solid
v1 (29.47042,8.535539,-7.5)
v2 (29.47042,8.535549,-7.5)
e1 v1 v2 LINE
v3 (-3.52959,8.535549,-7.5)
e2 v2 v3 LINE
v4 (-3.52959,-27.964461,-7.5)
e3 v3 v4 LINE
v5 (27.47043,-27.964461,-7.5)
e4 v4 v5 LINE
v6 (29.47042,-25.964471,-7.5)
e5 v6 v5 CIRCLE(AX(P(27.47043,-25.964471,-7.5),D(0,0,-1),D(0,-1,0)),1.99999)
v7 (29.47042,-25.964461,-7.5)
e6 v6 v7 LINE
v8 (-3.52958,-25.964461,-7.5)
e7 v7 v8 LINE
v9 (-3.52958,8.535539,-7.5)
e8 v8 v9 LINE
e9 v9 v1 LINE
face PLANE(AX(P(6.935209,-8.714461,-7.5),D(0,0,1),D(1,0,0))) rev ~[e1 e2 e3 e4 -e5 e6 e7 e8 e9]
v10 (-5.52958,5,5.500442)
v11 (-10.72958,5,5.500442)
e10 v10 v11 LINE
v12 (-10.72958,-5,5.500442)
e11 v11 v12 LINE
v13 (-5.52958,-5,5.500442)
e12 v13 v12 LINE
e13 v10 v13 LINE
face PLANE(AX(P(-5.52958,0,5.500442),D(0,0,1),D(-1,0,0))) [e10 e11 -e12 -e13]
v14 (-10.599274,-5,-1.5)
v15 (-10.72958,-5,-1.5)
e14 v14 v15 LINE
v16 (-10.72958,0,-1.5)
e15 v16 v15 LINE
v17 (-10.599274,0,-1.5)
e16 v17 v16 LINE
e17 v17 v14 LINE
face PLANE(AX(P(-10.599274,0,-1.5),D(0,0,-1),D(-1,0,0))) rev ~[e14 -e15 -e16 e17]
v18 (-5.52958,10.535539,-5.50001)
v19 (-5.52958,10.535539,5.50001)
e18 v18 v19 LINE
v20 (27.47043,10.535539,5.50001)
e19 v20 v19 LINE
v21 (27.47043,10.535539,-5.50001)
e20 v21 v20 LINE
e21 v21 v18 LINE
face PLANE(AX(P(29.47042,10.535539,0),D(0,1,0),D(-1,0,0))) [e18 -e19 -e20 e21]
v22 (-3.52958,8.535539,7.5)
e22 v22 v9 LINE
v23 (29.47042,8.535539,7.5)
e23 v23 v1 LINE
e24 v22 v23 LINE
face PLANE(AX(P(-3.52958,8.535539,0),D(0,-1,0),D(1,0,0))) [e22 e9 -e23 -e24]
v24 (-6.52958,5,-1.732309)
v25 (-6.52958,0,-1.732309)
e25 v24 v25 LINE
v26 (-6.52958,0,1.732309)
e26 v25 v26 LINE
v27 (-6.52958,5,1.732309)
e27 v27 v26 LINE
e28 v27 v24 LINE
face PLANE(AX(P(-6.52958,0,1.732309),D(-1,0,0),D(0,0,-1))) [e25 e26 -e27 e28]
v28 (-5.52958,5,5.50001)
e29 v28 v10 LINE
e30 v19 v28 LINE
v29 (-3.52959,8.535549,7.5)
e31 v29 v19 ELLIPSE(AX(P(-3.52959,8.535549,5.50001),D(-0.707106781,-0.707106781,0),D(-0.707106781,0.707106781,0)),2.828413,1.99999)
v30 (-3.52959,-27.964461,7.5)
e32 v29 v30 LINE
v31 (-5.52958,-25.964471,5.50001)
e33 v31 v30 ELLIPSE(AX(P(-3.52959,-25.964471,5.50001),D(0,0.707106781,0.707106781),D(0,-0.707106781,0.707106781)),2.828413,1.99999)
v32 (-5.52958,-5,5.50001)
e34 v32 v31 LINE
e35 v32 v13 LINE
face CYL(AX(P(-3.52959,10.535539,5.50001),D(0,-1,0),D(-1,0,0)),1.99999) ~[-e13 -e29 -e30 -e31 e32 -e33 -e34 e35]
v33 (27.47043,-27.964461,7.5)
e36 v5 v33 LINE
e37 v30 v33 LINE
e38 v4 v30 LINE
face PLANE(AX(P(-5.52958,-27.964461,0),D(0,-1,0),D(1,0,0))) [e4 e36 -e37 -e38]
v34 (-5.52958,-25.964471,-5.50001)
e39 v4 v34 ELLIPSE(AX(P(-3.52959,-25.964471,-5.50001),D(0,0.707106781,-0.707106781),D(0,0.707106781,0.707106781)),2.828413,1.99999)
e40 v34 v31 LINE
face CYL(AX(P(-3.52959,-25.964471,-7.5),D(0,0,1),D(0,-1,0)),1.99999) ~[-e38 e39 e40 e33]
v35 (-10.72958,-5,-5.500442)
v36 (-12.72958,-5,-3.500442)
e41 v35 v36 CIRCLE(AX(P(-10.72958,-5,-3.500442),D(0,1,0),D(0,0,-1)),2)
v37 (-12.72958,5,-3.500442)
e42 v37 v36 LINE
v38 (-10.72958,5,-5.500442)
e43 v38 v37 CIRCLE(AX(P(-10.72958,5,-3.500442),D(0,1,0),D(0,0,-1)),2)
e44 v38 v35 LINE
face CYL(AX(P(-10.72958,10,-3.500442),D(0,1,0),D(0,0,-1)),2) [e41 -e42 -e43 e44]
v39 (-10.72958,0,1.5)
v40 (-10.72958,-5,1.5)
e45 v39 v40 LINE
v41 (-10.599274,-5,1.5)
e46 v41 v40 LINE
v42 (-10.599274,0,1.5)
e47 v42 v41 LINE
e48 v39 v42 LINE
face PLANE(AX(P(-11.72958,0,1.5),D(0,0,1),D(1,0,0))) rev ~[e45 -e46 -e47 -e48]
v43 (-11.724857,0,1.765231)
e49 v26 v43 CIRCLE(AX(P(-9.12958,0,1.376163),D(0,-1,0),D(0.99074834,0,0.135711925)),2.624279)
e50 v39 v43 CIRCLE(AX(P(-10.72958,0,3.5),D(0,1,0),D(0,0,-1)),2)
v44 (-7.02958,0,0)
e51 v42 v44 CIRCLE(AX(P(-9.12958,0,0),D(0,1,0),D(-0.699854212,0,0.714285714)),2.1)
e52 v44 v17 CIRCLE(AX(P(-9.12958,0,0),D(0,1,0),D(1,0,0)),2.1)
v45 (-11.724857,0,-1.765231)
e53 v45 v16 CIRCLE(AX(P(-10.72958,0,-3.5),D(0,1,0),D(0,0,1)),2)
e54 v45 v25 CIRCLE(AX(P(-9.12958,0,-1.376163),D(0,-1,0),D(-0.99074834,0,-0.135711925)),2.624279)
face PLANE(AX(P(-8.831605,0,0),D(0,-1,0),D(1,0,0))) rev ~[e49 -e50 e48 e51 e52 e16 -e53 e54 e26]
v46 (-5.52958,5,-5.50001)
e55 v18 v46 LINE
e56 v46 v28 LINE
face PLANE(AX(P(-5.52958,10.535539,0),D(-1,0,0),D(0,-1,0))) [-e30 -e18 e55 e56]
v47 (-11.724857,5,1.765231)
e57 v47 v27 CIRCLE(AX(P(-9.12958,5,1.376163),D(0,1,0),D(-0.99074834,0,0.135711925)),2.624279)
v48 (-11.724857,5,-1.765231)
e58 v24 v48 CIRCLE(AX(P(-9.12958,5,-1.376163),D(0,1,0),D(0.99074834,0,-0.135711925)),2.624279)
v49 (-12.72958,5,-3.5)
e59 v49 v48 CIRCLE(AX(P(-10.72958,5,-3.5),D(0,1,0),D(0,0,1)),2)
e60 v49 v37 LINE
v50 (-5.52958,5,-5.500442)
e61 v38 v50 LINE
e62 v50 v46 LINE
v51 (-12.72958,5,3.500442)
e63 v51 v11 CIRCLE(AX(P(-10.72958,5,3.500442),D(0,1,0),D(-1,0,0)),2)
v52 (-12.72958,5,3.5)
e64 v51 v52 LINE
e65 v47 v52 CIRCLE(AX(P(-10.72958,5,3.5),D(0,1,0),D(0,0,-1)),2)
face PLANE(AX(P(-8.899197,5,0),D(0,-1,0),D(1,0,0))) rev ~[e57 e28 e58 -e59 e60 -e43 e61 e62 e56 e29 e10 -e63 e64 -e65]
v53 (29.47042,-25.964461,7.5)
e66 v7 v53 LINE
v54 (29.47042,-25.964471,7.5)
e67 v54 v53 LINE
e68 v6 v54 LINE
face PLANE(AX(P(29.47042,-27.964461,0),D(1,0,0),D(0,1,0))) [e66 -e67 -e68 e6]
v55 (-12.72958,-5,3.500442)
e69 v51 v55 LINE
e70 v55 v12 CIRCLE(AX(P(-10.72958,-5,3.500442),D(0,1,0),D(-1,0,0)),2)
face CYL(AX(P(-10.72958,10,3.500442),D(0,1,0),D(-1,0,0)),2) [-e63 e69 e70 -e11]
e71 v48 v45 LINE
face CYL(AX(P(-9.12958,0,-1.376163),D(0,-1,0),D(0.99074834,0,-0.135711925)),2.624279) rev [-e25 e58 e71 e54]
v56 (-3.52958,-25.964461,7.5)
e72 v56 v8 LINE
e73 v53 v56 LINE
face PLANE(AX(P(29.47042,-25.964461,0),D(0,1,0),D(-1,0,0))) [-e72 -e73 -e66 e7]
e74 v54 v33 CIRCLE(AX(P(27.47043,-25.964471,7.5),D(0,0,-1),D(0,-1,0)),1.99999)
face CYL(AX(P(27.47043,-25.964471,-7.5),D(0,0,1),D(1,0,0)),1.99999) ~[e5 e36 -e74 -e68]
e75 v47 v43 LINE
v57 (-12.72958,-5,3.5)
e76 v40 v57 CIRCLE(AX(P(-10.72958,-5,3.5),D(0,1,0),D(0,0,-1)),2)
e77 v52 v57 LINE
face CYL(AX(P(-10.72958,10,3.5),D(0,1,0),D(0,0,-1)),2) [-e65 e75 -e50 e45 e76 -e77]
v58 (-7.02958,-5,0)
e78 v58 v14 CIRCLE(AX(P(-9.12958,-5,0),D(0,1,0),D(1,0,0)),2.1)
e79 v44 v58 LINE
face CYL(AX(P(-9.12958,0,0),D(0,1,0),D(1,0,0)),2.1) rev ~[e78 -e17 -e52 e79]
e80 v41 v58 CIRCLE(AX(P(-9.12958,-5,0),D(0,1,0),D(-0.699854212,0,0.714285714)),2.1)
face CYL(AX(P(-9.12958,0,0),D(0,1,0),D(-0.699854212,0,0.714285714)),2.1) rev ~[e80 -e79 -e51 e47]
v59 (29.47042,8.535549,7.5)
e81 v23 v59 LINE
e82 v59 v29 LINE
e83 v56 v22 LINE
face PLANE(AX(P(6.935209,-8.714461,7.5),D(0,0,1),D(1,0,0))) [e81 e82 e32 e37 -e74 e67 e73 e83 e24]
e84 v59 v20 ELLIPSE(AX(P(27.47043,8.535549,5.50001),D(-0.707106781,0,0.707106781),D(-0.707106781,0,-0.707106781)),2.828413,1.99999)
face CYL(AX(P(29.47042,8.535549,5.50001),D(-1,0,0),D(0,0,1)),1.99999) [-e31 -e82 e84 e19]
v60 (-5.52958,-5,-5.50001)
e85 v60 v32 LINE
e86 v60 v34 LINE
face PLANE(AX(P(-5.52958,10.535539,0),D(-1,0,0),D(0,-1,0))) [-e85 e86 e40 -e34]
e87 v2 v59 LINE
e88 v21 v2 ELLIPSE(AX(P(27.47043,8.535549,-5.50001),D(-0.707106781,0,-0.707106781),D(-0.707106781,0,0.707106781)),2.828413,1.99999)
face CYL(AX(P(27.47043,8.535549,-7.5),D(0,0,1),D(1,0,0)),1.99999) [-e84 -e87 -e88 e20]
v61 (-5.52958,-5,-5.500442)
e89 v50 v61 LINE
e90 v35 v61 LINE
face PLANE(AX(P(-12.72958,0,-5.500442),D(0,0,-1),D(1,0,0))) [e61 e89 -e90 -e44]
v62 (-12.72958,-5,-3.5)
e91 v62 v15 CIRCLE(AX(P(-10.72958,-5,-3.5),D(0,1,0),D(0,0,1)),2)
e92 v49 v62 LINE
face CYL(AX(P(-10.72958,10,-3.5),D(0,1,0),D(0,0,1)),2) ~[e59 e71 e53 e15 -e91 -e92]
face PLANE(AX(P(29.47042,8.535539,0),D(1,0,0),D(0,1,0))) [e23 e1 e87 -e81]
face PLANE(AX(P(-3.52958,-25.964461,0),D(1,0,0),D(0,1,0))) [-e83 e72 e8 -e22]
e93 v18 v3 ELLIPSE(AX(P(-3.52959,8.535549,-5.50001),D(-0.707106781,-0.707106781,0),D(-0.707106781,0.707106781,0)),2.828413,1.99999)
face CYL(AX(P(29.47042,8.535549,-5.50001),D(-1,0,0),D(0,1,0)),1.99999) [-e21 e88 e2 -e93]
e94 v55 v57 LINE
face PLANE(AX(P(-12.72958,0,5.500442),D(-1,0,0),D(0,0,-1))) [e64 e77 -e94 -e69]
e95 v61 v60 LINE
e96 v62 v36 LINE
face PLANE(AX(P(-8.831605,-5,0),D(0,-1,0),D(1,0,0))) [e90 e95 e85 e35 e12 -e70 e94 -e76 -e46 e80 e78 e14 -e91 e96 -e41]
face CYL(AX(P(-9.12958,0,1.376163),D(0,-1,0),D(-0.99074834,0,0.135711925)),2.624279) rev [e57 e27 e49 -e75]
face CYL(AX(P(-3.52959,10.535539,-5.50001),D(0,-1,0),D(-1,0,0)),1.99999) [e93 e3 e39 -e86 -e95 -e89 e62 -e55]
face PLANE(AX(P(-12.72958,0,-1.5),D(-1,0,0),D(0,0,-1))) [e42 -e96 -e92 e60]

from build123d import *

# Parameters (mm, degrees)
F1_DEPTH    = 7.5
F2_R        = 1.99999
F4_DEPTH    = 5
F5_DEPTH    = 5
F6_T1_DEPTH = 20


# Not quite as in the source:
# - a fillet or chamfer that OpenCascade refuses, or shapes differently, is made with other operations: its cross-section is extruded or revolved along the edge and cut away or added
# - a fillet or chamfer is up to 0.001 mm smaller than in the source, because OpenCascade refuses the exact size


with BuildPart() as f1:
    # F0 (on Top) → F1 (new body, symmetric)
    with BuildSketch(Plane.XY):
        Polygon((29.4704200836, 8.5355388032), (29.4704200836, 10.5355388032), (-5.5295799164, 10.5355388032), (-5.5295799164, -27.9644611968), (29.4704200836, -27.9644611968), (29.4704200836, -25.9644611968), (27.4704200836, -25.9644611968), (-3.5295799164, -25.9644611968), (-3.5295799164, 8.5355388032), (27.4704200836, 8.5355388032), align=None)
    extrude(amount=F1_DEPTH, both=True)

    # F2 (radius 2 in the source; OpenCascade refuses exactly that, so slightly less here)
    f2_edges = [f1.edges().sort_by_distance(p)[0] for p in [
        (11.97042, 10.535539, 7.5),
        (11.97042, 10.535539, -7.5),
        (-5.52958, -8.714461, 7.5),
        (29.47042, -27.964461, 0),
        (-5.52958, -27.964461, 0),
        (29.47042, 10.535539, 0),
        (-5.52958, -8.714461, -7.5),
    ]]
    fillet(f2_edges, radius=F2_R)

    # F3 (on Front) → F4 (join, symmetric)
    with BuildSketch(Plane.XZ):
        with BuildLine():
            ThreePointArc((-11.7295799164, 1.7323087668), (-9.1295799164, 4.000441756), (-6.5295799164, 1.7323087668))
            Line((-6.5295799164, 1.7323087668), (-6.5295799164, -1.7323087668))
            ThreePointArc((-6.5295799164, -1.7323087668), (-9.1295799164, -4.000441756), (-11.7295799164, -1.7323087668))
            Line((-11.7295799164, -1.7323087668), (-11.7295799164, -1.5))
            Line((-11.7295799164, -1.5), (-12.7295799164, -1.5))
            Line((-12.7295799164, -1.5), (-12.7295799164, -5.500441756))
            Line((-12.7295799164, -5.500441756), (-5.5295799164, -5.500441756))
            Line((-5.5295799164, -5.500441756), (-5.5295799164, 5.500441756))
            Line((-5.5295799164, 5.500441756), (-12.7295799164, 5.500441756))
            Line((-12.7295799164, 5.500441756), (-12.7295799164, 1.5))
            Line((-12.7295799164, 1.5), (-11.7295799164, 1.5))
            Line((-11.7295799164, 1.5), (-11.7295799164, 1.7323087668))
        make_face()
    extrude(amount=F4_DEPTH, both=True)

    # F3 (on Front) → F5 (join)
    with BuildSketch(Plane.XZ):
        with BuildLine():
            Line((-6.5295799164, -1.7323087668), (-6.5295799164, 1.7323087668))
            ThreePointArc((-6.5295799164, 1.7323087668), (-9.1295799164, 4.000441756), (-11.7295799164, 1.7323087668))
            Line((-11.7295799164, 1.7323087668), (-11.7295799164, 1.5))
            Line((-11.7295799164, 1.5), (-10.5992737621, 1.5))
            ThreePointArc((-10.5992737621, 1.5), (-8.3160558159, 1.9360213165), (-7.0295799164, 0))
            ThreePointArc((-7.0295799164, 0), (-8.3160558159, -1.9360213165), (-10.5992737621, -1.5))
            Line((-10.5992737621, -1.5), (-11.7295799164, -1.5))
            Line((-11.7295799164, -1.5), (-11.7295799164, -1.7323087668))
            ThreePointArc((-11.7295799164, -1.7323087668), (-9.1295799164, -4.000441756), (-6.5295799164, -1.7323087668))
        make_face()
    extrude(amount=F5_DEPTH)

    # F6: fillet of radius 2 on 4 edges, made by hand

    # F6_s2 → F6_t1 (cut)
    with BuildSketch(Plane.XZ.offset(-10)):
        with BuildLine():
            ThreePointArc((-12.7295799164, 3.500441756), (-12.1437934788, 4.9146553183), (-10.7295799164, 5.500441756))
            Line((-10.7295799164, 5.500441756), (-12.7295799164, 5.500441756))
            Line((-12.7295799164, 5.500441756), (-12.7295799164, 3.500441756))
        make_face()
        with BuildLine():
            ThreePointArc((-10.7295799164, -5.500441756), (-12.1437934788, -4.9146553183), (-12.7295799164, -3.500441756))
            Line((-12.7295799164, -3.500441756), (-12.7295799164, -5.500441756))
            Line((-12.7295799164, -5.500441756), (-10.7295799164, -5.500441756))
        make_face()
        with BuildLine():
            ThreePointArc((-10.7295799164, 1.5), (-12.1437934788, 2.0857864376), (-12.7295799164, 3.5))
            Line((-12.7295799164, 3.5), (-12.7295799164, 1.5))
            Line((-12.7295799164, 1.5), (-10.7295799164, 1.5))
        make_face()
        with BuildLine():
            ThreePointArc((-10.7295799164, -1.5), (-12.1437934788, -2.0857864376), (-12.7295799164, -3.5))
            Line((-12.7295799164, -3.5), (-12.7295799164, -1.5))
            Line((-12.7295799164, -1.5), (-10.7295799164, -1.5))
        make_face()
    extrude(amount=F6_T1_DEPTH, mode=Mode.SUBTRACT)


solid = f1.part
